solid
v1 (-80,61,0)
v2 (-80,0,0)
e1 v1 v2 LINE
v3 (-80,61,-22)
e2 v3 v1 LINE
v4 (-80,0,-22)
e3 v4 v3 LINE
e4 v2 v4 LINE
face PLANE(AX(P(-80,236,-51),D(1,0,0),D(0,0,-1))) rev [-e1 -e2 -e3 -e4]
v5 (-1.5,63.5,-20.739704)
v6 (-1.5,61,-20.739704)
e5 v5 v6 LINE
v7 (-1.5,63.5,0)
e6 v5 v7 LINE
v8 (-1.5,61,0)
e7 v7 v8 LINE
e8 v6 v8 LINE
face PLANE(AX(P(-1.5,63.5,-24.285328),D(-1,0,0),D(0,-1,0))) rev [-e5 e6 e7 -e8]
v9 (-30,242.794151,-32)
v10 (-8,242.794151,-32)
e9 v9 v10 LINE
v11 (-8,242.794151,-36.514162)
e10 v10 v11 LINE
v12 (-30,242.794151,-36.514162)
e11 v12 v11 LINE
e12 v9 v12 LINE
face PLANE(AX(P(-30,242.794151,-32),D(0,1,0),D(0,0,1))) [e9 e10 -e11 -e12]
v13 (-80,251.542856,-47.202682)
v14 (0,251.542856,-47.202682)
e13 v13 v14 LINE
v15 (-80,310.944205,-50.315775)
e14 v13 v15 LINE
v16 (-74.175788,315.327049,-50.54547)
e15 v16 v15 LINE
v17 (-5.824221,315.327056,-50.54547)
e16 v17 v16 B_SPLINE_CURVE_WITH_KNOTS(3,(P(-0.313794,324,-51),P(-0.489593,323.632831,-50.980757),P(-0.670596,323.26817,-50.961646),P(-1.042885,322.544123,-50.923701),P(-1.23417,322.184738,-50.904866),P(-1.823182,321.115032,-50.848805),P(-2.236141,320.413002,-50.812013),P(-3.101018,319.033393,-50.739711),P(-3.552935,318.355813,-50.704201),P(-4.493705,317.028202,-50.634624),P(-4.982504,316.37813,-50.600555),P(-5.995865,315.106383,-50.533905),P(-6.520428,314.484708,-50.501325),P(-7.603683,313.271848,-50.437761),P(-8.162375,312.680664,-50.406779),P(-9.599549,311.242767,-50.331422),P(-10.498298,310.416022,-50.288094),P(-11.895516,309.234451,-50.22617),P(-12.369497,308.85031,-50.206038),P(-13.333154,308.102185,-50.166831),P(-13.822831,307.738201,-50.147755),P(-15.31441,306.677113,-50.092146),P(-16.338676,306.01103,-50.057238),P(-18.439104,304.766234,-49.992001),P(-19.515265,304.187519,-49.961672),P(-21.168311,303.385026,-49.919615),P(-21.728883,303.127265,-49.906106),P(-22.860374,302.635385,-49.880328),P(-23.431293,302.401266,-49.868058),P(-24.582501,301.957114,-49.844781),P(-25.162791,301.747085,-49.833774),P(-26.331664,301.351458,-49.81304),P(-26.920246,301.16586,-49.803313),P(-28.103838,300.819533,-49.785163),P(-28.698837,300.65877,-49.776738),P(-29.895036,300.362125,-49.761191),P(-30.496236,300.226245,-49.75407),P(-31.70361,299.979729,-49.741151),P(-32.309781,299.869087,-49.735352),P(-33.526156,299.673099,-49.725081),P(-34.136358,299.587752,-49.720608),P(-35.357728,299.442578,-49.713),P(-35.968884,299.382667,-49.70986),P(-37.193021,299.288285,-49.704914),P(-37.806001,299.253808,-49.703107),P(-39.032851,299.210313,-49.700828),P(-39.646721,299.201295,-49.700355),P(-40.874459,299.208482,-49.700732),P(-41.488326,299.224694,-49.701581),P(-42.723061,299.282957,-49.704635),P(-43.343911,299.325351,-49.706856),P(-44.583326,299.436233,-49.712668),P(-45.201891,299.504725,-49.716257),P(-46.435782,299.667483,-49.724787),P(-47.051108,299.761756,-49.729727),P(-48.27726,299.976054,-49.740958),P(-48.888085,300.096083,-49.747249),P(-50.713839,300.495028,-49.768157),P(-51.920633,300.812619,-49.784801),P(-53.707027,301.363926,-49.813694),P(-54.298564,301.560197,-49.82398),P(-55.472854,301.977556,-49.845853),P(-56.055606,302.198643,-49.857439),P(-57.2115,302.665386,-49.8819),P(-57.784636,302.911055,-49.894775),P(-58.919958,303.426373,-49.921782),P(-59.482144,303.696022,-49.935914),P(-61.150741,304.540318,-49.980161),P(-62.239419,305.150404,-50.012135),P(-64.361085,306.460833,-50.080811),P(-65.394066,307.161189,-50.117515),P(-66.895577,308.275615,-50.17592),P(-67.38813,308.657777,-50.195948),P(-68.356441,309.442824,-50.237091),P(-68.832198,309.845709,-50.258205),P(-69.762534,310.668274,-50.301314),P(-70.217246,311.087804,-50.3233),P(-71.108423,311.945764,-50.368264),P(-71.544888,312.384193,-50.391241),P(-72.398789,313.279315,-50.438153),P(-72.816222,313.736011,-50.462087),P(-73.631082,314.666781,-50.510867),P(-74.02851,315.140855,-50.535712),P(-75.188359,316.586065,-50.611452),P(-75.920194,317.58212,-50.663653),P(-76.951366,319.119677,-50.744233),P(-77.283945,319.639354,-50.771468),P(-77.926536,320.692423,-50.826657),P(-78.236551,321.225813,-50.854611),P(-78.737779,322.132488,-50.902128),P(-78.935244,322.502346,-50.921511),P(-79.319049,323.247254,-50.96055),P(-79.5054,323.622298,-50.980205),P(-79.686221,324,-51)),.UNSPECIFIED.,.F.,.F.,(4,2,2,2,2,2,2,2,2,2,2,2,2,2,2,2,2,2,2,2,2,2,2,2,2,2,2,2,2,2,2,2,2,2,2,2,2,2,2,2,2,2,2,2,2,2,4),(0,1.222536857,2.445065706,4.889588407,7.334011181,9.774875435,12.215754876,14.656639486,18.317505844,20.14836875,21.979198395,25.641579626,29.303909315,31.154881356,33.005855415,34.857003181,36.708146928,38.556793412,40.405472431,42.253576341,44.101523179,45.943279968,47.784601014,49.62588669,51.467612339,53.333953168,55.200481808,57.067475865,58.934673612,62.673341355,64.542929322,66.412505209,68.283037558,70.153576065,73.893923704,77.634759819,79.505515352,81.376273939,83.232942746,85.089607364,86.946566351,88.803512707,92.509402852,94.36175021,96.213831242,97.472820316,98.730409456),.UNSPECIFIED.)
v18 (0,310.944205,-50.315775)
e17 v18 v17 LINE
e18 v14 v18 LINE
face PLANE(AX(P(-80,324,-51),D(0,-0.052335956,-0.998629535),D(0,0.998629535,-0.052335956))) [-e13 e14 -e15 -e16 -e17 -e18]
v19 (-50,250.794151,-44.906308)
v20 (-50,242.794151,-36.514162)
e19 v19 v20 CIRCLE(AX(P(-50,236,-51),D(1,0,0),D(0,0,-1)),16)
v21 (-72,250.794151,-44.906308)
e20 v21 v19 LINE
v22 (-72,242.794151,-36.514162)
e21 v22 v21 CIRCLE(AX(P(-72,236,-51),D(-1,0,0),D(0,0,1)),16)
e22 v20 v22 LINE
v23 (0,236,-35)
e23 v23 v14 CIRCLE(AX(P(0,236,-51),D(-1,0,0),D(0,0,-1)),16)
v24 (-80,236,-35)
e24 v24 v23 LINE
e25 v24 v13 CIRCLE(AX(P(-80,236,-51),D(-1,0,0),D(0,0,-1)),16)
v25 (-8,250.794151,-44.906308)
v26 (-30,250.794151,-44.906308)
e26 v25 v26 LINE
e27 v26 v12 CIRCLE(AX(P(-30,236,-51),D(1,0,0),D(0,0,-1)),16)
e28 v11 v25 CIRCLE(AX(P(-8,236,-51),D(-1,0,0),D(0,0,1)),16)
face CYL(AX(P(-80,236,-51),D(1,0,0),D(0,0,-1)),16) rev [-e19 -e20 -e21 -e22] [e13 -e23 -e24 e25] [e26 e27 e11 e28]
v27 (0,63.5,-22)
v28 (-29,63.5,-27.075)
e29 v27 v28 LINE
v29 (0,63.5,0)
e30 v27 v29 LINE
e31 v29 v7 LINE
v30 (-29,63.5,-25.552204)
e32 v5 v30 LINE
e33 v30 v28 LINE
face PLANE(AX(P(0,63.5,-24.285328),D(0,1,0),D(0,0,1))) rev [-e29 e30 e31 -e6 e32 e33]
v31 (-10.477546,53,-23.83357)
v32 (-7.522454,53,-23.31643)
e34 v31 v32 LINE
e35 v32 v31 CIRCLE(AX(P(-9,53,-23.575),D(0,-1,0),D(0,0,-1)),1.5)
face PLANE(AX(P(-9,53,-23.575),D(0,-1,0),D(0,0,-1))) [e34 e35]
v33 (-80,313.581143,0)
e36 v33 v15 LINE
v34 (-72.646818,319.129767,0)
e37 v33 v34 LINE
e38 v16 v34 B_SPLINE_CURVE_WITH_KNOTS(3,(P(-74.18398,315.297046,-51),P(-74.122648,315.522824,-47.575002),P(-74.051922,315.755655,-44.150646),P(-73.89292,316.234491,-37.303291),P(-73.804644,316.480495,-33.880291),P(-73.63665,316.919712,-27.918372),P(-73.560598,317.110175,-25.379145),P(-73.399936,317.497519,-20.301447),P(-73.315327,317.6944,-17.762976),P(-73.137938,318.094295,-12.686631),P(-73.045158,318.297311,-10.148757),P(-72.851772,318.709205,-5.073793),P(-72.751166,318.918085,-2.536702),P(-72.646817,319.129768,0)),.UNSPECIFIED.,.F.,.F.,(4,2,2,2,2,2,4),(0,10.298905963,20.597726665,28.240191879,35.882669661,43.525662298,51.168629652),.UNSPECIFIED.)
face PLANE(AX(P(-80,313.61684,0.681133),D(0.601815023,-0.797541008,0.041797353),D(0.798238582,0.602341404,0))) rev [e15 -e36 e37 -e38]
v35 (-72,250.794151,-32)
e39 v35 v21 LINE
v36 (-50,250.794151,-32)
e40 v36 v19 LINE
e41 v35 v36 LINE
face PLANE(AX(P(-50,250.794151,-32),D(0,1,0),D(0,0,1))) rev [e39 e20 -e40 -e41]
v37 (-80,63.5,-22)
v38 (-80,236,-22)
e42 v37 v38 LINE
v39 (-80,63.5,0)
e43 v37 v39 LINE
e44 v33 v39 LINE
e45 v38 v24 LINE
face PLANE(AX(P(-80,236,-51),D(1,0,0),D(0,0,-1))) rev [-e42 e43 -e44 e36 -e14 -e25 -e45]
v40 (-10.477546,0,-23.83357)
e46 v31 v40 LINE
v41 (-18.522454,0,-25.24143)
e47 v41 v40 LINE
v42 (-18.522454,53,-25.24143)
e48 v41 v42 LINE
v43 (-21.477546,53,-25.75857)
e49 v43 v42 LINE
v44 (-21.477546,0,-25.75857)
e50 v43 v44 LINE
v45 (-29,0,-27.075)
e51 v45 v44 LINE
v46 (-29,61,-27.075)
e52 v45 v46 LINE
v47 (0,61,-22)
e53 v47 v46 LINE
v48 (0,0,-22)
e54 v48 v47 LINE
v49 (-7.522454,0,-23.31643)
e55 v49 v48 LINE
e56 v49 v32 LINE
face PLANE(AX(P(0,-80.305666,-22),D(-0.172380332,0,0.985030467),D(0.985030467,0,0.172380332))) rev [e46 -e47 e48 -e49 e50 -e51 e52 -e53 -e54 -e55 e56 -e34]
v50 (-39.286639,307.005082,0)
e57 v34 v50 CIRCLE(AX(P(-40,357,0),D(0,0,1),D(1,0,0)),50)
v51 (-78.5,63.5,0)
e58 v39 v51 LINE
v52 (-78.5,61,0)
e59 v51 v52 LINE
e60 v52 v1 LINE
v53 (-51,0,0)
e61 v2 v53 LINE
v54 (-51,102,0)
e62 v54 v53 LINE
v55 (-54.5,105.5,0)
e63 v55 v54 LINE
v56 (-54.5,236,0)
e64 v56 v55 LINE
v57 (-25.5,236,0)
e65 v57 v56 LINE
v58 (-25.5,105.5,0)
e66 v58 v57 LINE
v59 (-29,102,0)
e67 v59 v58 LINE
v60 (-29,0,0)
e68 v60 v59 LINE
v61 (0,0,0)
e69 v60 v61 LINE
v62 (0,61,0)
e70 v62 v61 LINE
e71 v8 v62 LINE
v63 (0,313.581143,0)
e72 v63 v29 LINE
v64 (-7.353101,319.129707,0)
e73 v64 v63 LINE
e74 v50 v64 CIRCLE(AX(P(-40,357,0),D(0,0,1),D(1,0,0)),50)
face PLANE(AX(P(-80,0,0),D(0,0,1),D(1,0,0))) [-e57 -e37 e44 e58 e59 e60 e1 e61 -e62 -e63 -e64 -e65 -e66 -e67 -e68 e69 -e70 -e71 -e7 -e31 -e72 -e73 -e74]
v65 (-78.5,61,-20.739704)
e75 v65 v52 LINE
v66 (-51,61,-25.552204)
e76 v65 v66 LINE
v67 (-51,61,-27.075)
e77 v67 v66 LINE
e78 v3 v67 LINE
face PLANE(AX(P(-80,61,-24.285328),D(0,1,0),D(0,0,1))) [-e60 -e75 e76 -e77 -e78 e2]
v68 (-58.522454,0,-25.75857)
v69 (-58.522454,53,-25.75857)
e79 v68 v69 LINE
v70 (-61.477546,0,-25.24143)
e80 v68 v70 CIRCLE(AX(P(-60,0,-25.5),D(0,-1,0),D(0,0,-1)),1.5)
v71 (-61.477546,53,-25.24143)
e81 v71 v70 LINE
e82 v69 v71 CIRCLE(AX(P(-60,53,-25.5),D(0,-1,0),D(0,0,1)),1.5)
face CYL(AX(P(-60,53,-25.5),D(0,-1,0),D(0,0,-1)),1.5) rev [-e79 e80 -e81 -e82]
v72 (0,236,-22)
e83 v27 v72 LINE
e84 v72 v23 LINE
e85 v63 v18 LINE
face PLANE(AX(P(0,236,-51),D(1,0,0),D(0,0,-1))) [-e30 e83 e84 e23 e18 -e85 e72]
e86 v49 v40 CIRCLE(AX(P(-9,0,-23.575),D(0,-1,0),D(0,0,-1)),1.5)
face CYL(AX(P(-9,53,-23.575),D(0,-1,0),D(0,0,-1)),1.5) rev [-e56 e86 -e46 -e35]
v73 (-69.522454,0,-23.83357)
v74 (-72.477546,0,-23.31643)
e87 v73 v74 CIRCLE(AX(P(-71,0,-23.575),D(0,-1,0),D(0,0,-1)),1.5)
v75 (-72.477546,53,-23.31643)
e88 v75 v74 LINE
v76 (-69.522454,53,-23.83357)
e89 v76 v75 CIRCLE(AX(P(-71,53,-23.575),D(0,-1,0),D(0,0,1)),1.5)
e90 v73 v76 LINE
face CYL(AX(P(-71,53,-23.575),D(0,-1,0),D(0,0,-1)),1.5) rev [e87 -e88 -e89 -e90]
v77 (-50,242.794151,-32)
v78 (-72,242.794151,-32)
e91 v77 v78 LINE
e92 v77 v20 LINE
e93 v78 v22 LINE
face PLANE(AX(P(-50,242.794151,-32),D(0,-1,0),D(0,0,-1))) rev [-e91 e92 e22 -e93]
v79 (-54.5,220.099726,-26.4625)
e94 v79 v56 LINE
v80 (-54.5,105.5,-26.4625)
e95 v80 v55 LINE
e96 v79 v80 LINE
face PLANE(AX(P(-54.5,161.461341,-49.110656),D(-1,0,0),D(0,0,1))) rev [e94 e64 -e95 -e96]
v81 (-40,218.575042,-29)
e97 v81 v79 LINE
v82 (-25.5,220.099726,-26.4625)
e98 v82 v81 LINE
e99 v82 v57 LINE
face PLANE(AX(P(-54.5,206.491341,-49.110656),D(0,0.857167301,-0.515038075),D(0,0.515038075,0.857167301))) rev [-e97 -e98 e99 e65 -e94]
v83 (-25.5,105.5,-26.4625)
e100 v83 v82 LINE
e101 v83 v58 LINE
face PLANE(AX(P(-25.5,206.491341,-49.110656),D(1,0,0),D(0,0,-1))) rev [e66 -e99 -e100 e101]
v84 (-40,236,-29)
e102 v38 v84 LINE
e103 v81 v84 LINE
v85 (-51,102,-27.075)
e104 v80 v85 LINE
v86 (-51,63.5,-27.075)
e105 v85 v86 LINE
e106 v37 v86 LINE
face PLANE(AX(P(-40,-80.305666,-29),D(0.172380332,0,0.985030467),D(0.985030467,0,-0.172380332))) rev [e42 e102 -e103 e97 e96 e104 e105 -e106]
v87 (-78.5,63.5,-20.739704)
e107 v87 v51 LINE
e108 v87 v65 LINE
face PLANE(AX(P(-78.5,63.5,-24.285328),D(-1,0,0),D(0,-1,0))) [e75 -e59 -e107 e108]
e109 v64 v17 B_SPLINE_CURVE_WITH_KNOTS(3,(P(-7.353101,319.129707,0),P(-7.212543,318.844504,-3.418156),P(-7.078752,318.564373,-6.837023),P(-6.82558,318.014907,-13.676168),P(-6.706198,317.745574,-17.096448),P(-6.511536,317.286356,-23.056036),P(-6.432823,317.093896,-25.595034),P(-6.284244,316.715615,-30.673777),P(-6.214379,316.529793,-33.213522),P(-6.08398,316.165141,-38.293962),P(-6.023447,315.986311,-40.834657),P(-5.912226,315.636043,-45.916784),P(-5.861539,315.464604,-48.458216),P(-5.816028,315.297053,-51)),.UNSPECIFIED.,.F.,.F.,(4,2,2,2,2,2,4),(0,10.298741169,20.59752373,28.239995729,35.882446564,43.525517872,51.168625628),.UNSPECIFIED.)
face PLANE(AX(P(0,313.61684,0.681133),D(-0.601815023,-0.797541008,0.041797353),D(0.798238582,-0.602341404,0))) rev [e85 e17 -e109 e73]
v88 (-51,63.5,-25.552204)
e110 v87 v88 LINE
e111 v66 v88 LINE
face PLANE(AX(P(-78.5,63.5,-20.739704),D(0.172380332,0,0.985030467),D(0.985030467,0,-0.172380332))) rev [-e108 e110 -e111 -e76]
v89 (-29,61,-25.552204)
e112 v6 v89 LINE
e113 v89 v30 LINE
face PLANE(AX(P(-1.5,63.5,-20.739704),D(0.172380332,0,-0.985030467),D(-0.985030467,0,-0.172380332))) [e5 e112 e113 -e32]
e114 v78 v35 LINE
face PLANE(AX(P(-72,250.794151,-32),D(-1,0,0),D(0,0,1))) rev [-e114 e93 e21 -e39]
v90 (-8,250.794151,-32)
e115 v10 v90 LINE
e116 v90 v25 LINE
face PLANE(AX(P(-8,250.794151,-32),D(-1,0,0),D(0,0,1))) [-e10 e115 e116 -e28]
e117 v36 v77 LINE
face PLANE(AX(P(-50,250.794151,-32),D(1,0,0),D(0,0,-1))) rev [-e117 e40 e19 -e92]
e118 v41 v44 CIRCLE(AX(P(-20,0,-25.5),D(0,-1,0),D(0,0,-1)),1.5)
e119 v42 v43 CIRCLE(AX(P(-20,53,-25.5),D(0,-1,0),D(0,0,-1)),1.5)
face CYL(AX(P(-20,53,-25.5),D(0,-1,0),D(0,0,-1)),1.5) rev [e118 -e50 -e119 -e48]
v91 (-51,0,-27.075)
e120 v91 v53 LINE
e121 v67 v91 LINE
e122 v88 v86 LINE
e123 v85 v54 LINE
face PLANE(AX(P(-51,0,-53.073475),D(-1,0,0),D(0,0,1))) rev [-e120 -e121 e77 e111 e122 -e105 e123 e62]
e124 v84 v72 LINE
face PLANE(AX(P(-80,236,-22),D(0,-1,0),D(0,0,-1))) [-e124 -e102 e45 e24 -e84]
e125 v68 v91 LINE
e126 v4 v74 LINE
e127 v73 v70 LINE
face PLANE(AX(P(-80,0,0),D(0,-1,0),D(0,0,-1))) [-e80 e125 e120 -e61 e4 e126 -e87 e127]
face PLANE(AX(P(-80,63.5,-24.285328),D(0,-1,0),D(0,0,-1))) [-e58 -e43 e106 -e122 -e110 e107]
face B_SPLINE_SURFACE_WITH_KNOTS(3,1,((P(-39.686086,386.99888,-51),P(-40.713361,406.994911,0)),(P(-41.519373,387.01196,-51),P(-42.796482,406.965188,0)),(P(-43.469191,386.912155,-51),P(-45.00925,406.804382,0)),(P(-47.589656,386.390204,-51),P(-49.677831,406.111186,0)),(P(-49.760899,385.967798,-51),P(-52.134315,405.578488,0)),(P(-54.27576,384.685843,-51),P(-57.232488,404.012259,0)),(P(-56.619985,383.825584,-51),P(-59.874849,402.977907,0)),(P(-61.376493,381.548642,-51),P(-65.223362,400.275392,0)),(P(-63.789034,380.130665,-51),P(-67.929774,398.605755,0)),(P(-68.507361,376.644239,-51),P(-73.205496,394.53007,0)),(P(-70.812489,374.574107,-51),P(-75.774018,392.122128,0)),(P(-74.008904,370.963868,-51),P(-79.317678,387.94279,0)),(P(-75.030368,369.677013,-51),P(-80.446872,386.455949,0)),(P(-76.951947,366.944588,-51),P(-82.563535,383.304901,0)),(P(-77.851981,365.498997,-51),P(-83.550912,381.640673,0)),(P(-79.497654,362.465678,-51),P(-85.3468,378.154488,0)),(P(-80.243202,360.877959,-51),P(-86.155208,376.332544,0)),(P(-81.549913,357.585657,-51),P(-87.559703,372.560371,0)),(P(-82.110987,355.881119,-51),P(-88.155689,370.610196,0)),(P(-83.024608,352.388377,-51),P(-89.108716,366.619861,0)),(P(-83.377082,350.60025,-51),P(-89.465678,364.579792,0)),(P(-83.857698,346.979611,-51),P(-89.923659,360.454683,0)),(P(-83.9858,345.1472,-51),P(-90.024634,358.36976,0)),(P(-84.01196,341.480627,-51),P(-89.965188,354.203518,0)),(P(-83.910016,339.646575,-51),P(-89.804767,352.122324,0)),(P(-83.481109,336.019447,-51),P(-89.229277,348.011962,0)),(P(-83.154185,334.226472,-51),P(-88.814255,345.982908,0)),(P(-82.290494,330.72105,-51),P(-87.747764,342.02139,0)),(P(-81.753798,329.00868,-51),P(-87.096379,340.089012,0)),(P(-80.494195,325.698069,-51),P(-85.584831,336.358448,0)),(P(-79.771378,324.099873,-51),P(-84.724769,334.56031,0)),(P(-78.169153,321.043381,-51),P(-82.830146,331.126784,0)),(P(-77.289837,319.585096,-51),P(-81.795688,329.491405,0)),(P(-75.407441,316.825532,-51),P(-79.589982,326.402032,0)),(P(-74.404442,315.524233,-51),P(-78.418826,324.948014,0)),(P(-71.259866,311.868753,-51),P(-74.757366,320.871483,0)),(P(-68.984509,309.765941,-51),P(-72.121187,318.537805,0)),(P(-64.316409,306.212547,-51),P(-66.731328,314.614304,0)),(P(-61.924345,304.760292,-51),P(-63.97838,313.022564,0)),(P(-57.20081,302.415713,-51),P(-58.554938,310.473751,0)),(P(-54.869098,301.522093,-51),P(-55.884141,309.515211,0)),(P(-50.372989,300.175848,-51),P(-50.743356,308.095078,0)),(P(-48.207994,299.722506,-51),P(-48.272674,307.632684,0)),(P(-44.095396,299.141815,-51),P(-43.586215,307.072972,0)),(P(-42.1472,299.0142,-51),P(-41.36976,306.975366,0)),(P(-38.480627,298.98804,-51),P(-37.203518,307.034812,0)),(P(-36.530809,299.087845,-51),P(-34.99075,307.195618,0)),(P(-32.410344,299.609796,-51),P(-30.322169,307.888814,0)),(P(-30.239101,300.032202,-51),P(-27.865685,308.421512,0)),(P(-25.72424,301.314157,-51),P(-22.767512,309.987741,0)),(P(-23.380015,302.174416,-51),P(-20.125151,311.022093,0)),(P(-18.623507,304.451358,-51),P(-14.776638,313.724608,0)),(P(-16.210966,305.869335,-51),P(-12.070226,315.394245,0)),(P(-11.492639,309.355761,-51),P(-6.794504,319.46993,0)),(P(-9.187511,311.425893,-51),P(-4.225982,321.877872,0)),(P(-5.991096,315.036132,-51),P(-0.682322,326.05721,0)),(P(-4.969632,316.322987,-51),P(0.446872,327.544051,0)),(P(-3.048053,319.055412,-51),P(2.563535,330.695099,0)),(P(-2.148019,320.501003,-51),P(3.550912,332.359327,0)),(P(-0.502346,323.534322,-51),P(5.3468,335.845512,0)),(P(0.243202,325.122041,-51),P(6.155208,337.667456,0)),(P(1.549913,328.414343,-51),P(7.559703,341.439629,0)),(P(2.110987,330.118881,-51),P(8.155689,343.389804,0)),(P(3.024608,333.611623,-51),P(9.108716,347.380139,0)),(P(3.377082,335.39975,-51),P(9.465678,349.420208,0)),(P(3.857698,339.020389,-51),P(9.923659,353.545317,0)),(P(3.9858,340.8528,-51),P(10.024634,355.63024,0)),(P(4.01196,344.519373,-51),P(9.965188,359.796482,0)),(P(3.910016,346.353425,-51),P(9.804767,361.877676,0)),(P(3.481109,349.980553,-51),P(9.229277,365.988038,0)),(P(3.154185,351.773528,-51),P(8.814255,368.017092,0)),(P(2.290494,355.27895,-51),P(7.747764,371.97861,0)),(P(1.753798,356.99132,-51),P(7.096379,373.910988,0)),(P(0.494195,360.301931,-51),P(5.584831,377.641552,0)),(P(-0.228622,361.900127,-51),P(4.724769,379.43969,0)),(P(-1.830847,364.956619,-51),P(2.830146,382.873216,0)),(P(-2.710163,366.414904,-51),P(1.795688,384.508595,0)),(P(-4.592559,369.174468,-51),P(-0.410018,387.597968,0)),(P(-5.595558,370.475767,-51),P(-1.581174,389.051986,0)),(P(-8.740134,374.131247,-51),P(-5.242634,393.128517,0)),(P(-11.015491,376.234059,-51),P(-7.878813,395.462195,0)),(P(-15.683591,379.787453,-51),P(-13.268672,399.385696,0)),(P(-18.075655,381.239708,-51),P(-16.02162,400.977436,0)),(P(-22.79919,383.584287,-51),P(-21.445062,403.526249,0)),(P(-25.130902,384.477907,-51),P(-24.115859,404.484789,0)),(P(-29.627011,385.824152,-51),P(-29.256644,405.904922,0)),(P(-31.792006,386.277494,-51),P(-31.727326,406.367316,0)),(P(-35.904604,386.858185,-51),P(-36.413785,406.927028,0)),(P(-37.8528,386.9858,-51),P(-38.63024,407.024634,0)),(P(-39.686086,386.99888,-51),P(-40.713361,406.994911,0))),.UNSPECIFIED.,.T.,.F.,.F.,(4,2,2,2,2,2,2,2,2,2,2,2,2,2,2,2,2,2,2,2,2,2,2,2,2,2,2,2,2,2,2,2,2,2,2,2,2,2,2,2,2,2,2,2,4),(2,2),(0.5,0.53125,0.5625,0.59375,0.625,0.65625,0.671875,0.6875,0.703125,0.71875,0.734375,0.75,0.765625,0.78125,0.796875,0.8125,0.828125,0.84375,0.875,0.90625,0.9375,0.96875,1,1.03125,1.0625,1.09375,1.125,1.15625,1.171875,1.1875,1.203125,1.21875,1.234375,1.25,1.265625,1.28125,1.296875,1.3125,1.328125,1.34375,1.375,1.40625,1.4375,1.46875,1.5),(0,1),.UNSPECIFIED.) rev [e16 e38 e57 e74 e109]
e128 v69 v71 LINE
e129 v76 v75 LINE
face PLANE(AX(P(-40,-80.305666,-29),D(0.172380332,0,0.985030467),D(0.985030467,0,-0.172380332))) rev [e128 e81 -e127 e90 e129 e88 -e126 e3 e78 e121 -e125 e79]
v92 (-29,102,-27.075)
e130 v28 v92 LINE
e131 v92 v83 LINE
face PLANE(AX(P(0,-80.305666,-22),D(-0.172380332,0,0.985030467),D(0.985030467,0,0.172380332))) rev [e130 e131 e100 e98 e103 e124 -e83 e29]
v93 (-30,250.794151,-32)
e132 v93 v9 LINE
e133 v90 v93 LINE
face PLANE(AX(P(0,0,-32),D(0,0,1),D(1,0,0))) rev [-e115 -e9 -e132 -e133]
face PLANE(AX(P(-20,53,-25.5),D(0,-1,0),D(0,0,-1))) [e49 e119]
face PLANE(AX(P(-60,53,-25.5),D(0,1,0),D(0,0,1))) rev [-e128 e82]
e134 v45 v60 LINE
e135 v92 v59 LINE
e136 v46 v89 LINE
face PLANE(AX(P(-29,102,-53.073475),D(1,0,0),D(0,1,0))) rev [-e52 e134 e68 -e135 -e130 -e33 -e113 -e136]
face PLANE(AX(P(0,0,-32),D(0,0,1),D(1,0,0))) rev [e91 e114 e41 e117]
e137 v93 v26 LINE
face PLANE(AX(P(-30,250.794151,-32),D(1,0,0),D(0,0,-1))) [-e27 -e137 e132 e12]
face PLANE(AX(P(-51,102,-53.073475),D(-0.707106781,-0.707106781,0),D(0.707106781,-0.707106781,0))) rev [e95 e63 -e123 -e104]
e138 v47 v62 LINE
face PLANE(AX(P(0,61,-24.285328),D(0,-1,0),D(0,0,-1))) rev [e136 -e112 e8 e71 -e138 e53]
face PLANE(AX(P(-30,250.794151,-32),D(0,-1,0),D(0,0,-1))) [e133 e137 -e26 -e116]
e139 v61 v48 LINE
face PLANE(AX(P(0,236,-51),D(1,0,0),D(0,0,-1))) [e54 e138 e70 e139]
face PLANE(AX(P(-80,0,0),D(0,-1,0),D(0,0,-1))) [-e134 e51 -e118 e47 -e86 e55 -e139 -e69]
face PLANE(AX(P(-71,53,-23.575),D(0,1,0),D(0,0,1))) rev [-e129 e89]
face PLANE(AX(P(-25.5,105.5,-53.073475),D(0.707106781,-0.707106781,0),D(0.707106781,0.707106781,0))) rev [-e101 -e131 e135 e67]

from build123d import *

# Parameters (mm, degrees)
EXTRUDE_1_DEPTH     = 80
CUT_EXTRUDE_1_DEPTH = 338.16811987
CUT_EXTRUDE_4_DEPTH = 258.724089853
EXTRUDE_2_DEPTH     = 236
SKETCH_8_W          = 29
SKETCH_8_H          = 45.03
CUT_EXTRUDE_5_DEPTH = 333.864316987
SKETCH_11_W         = 1.5
SKETCH_11_H         = 2.5
SKETCH_12_R         = 1.5
CUT_EXTRUDE_6_DEPTH = 53


with BuildPart() as part:
    # Эскиз1 → Бобышка-Вытянуть1 (new body)
    with BuildSketch(Plane(origin=(0, 0, 0), x_dir=(0, 0, -1), z_dir=(1, 0, 0))):
        with BuildLine():
            Line((0, 0), (0, 324))
            Line((0, 324), (51, 324))
            Line((51, 324), (47.202681995, 251.542856107))
            ThreePointArc((47.202681995, 251.542856107), (38.415146245, 245.880357077), (35, 236))
            Line((35, 236), (22, 236))
            Line((22, 236), (22, 0))
            Line((22, 0), (0, 0))
        make_face()
    extrude(amount=-EXTRUDE_1_DEPTH)

    # Вырез-По сечениям1: read off the stored shape, not the designer's step
    # Вырез-По сечениям1: loft between two sections, ruled curve by curve
    loft_1_from = [
        Edge.make_bspline([(-39.686086493, 386.998880194, -51), (-41.519373167, 387.011959923, -51), (-43.469191145, 386.912155262, -51), (-47.589656467, 386.390203752, -51), (-49.760899046, 385.967798341, -51), (-54.275759928, 384.685843196, -51), (-56.619984777, 383.82558407, -51), (-61.376492683, 381.5486416, -51), (-63.789033826, 380.130665414, -51), (-68.507360794, 376.644239105, -51), (-70.812489477, 374.574106824, -51), (-74.008903802, 370.963867661, -51), (-75.030367598, 369.677012554, -51), (-76.951946734, 366.944587811, -51), (-77.851980564, 365.498997396, -51), (-79.497654124, 362.465678388, -51), (-80.243201605, 360.877958795, -51), (-81.549913197, 357.585657318, -51), (-82.110987295, 355.881119395, -51), (-83.024607662, 352.388377038, -51), (-83.377081555, 350.600250078, -51), (-83.857698345, 346.979610705, -51), (-83.985800464, 345.147200182, -51), (-84.011959923, 341.480626833, -51), (-83.910016471, 339.646575032, -51), (-83.481109456, 336.019446589, -51), (-83.154185214, 334.226472409, -51), (-82.290493812, 330.721049679, -51), (-81.753797915, 329.008679629, -51), (-80.494195327, 325.69806858, -51), (-79.771378013, 324.099872821, -51), (-78.169152689, 321.043381421, -51), (-77.289836791, 319.585096094, -51), (-75.407440689, 316.825531587, -51), (-74.404442283, 315.524232794, -51), (-71.259865805, 311.868753328, -51), (-68.984509326, 309.765941211, -51), (-64.316408519, 306.212546688, -51), (-61.924345268, 304.76029167, -51), (-57.200809972, 302.415713078, -51), (-54.869098312, 301.522093112, -51), (-50.372988531, 300.17584848, -51), (-48.207994046, 299.722505841, -51), (-44.095395614, 299.141814883, -51), (-42.147200182, 299.014199536, -51), (-38.480626833, 298.988040077, -51), (-36.530808855, 299.087844738, -51), (-32.410343533, 299.609796248, -51), (-30.239100954, 300.032201659, -51), (-25.724240072, 301.314156804, -51), (-23.380015223, 302.17441593, -51), (-18.623507317, 304.4513584, -51), (-16.210966174, 305.869334586, -51), (-11.492639206, 309.355760895, -51), (-9.187510523, 311.425893176, -51), (-5.991096198, 315.036132339, -51), (-4.969632402, 316.322987446, -51), (-3.048053266, 319.055412189, -51), (-2.148019436, 320.501002604, -51), (-0.502345876, 323.534321612, -51), (0.243201605, 325.122041205, -51), (1.549913197, 328.414342682, -51), (2.110987295, 330.118880605, -51), (3.024607662, 333.611622962, -51), (3.377081555, 335.399749922, -51), (3.857698345, 339.020389295, -51), (3.985800464, 340.852799818, -51), (4.011959923, 344.519373167, -51), (3.910016471, 346.353424968, -51), (3.481109456, 349.980553411, -51), (3.154185214, 351.773527591, -51), (2.290493812, 355.278950321, -51), (1.753797915, 356.991320371, -51), (0.494195327, 360.30193142, -51), (-0.228621987, 361.900127179, -51), (-1.830847311, 364.956618579, -51), (-2.710163209, 366.414903906, -51), (-4.592559311, 369.174468413, -51), (-5.595557717, 370.475767206, -51), (-8.740134195, 374.131246672, -51), (-11.015490674, 376.234058789, -51), (-15.683591481, 379.787453312, -51), (-18.075654732, 381.23970833, -51), (-22.799190028, 383.584286922, -51), (-25.130901688, 384.477906888, -51), (-29.627011469, 385.82415152, -51), (-31.792005954, 386.277494159, -51), (-35.904604386, 386.858185117, -51), (-37.852799818, 386.985800464, -51), (-39.686086493, 386.998880194, -51)], [0.5, 0.5, 0.5, 0.5, 0.53125, 0.53125, 0.5625, 0.5625, 0.59375, 0.59375, 0.625, 0.625, 0.65625, 0.65625, 0.671875, 0.671875, 0.6875, 0.6875, 0.703125, 0.703125, 0.71875, 0.71875, 0.734375, 0.734375, 0.75, 0.75, 0.765625, 0.765625, 0.78125, 0.78125, 0.796875, 0.796875, 0.8125, 0.8125, 0.828125, 0.828125, 0.84375, 0.84375, 0.875, 0.875, 0.90625, 0.90625, 0.9375, 0.9375, 0.96875, 0.96875, 1, 1, 1.03125, 1.03125, 1.0625, 1.0625, 1.09375, 1.09375, 1.125, 1.125, 1.15625, 1.15625, 1.171875, 1.171875, 1.1875, 1.1875, 1.203125, 1.203125, 1.21875, 1.21875, 1.234375, 1.234375, 1.25, 1.25, 1.265625, 1.265625, 1.28125, 1.28125, 1.296875, 1.296875, 1.3125, 1.3125, 1.328125, 1.328125, 1.34375, 1.34375, 1.375, 1.375, 1.40625, 1.40625, 1.4375, 1.4375, 1.46875, 1.46875, 1.5, 1.5, 1.5, 1.5], 3),
    ]
    loft_1_to = [
        Edge.make_bspline([(-40.713360954, 406.994910903, 0), (-42.796482241, 406.965187529, 0), (-45.009249926, 406.804381918, 0), (-49.677831319, 406.111186343, 0), (-52.134314987, 405.57848815, 0), (-57.232488149, 404.012258649, 0), (-59.874849492, 402.977906649, 0), (-65.223361777, 400.275392116, 0), (-67.929774494, 398.605754504, 0), (-73.205496114, 394.530069796, 0), (-75.774017529, 392.122127574, 0), (-79.317678059, 387.942789724, 0), (-80.446871791, 386.455948521, 0), (-82.56353512, 383.304901046, 0), (-83.550911607, 381.64067315, 0), (-85.346800294, 378.15448837, 0), (-86.155207908, 376.332543952, 0), (-87.559702616, 372.560371453, 0), (-88.155688516, 370.610195503, 0), (-89.108716472, 366.619860939, 0), (-89.465678189, 364.579792104, 0), (-89.923659015, 360.454683427, 0), (-90.024634276, 358.369760334, 0), (-89.965187529, 354.203517759, 0), (-89.804767323, 352.122324432, 0), (-89.229277266, 348.011962011, 0), (-88.814254578, 345.982908368, 0), (-87.74776424, 342.021389647, 0), (-87.09637946, 340.08901202, 0), (-85.584830664, 336.358447587, 0), (-84.72476929, 334.560310005, 0), (-82.830145523, 331.126783934, 0), (-81.795688029, 329.491404922, 0), (-79.589982191, 326.402031913, 0), (-78.418826302, 324.948013642, 0), (-74.757365501, 320.871483301, 0), (-72.121187465, 318.537805224, 0), (-66.731328092, 314.614304187, 0), (-63.978379853, 313.022564402, 0), (-58.5549381, 310.473751342, 0), (-55.884140832, 309.515211055, 0), (-50.743356242, 308.095077878, 0), (-48.27267393, 307.632683797, 0), (-43.586215216, 307.072972214, 0), (-41.369760334, 306.975365724, 0), (-37.203517759, 307.034812471, 0), (-34.990750074, 307.195618082, 0), (-30.322168681, 307.888813657, 0), (-27.865685013, 308.42151185, 0), (-22.767511851, 309.987741351, 0), (-20.125150508, 311.022093351, 0), (-14.776638223, 313.724607884, 0), (-12.070225506, 315.394245496, 0), (-6.794503886, 319.469930204, 0), (-4.225982471, 321.877872426, 0), (-0.682321941, 326.057210276, 0), (0.446871791, 327.544051479, 0), (2.56353512, 330.695098954, 0), (3.550911607, 332.35932685, 0), (5.346800294, 335.84551163, 0), (6.155207908, 337.667456048, 0), (7.559702616, 341.439628547, 0), (8.155688516, 343.389804497, 0), (9.108716472, 347.380139061, 0), (9.465678189, 349.420207896, 0), (9.923659015, 353.545316573, 0), (10.024634276, 355.630239666, 0), (9.965187529, 359.796482241, 0), (9.804767323, 361.877675568, 0), (9.229277266, 365.988037989, 0), (8.814254578, 368.017091632, 0), (7.74776424, 371.978610353, 0), (7.09637946, 373.91098798, 0), (5.584830664, 377.641552413, 0), (4.72476929, 379.439689995, 0), (2.830145523, 382.873216066, 0), (1.795688029, 384.508595078, 0), (-0.410017809, 387.597968087, 0), (-1.581173698, 389.051986358, 0), (-5.242634499, 393.128516699, 0), (-7.878812535, 395.462194776, 0), (-13.268671908, 399.385695813, 0), (-16.021620147, 400.977435598, 0), (-21.4450619, 403.526248658, 0), (-24.115859168, 404.484788945, 0), (-29.256643758, 405.904922122, 0), (-31.72732607, 406.367316203, 0), (-36.413784784, 406.927027786, 0), (-38.630239666, 407.024634276, 0), (-40.713360954, 406.994910903, 0)], [0.5, 0.5, 0.5, 0.5, 0.53125, 0.53125, 0.5625, 0.5625, 0.59375, 0.59375, 0.625, 0.625, 0.65625, 0.65625, 0.671875, 0.671875, 0.6875, 0.6875, 0.703125, 0.703125, 0.71875, 0.71875, 0.734375, 0.734375, 0.75, 0.75, 0.765625, 0.765625, 0.78125, 0.78125, 0.796875, 0.796875, 0.8125, 0.8125, 0.828125, 0.828125, 0.84375, 0.84375, 0.875, 0.875, 0.90625, 0.90625, 0.9375, 0.9375, 0.96875, 0.96875, 1, 1, 1.03125, 1.03125, 1.0625, 1.0625, 1.09375, 1.09375, 1.125, 1.125, 1.15625, 1.15625, 1.171875, 1.171875, 1.1875, 1.1875, 1.203125, 1.203125, 1.21875, 1.21875, 1.234375, 1.234375, 1.25, 1.25, 1.265625, 1.265625, 1.28125, 1.28125, 1.296875, 1.296875, 1.3125, 1.3125, 1.328125, 1.328125, 1.34375, 1.34375, 1.375, 1.375, 1.40625, 1.40625, 1.4375, 1.4375, 1.46875, 1.46875, 1.5, 1.5, 1.5, 1.5], 3),
    ]
    loft_1 = Solid(Shell([*[Face.make_surface_from_curves(loft_1_from[k], loft_1_to[k]) for k in range(1)], Face(Wire(loft_1_from)), Face(Wire(loft_1_to))]))
    add(loft_1, mode=Mode.SUBTRACT)

    # Эскиз5 → Вырез-Вытянуть1 (cut, through all)
    with BuildSketch(Plane(origin=(0, -1.778022863, -33.926697283), x_dir=(-1, 0, 0), z_dir=(0, -0.05233595624294387, -0.998629534754574))):
        Polygon((80, 313.151391037), (56.299680313, 331.010862926), (80, 331.010862926), align=None)
        Polygon((0, 313.151391037), (23.700319687, 331.010862926), (0, 331.010862926), align=None)
    extrude(amount=-CUT_EXTRUDE_1_DEPTH, mode=Mode.SUBTRACT)

    # Эскиз3 → Вырез-Вытянуть4 (cut, through all)
    with BuildSketch(Plane(origin=(-50, 250.794151495, -32), x_dir=(-0.9397934234884354, -0.341743063086709, -1.1856594285774567e-15), z_dir=(0, 0, -1))):
        Polygon((0, 0), (20.675455317, 7.518347388), (23.409399821, 0), (2.733944505, -7.518347388), align=None)
    cut_extrude_4 = extrude(amount=CUT_EXTRUDE_4_DEPTH, mode=Mode.SUBTRACT)

    # Зеркальное отражение1: Вырез-Вытянуть4 across plane
    add(cut_extrude_4.mirror(Plane(origin=(-40, 0, 0), x_dir=(0, 0, 1), z_dir=(1, 0, 0))), mode=Mode.SUBTRACT)

    # Эскиз6 → Бобышка-Вытянуть2 (add)
    with BuildSketch(Plane.XZ.offset(-236)):
        Polygon((0, -22), (-40, -29), (-80, -22), align=None)
    extrude(amount=EXTRUDE_2_DEPTH)

    # Вырез-По траектории1: sweep along a curve in space
    with BuildLine() as sweep_1_path:
        Line((-40, 236, 0), (-40, 206.49134077, -49.110656108))
    # Эскиз8 → Вырез-По траектории1 (sweep, cut)
    with BuildSketch(Plane.XY):
        with Locations((-40, 213.485)):
            Rectangle(SKETCH_8_W, SKETCH_8_H)
    sweep(path=sweep_1_path.line, mode=Mode.SUBTRACT)

    # Эскиз9 → Вырез-Вытянуть5 (cut, through all)
    with BuildSketch(Plane.XY):
        Polygon((-54.5, 190.97), (-25.5, 190.97), (-25.5, 105.5), (-29, 102), (-29, 0), (-51, 0), (-51, 102), (-54.5, 105.5), align=None)
    extrude(amount=-CUT_EXTRUDE_5_DEPTH, mode=Mode.SUBTRACT)

    # Вырез-По траектории4: sweep along a curve in space
    with BuildLine() as sweep_4_path:
        Line((0, 62.25, 0), (0, 62.25, -22))
        Line((0, 62.25, -22), (-29, 62.25, -27.075))
    # Эскиз11 → Вырез-По траектории4 (sweep, cut)
    with BuildSketch(Plane.XY):
        with Locations((-0.75, 62.25)):
            Rectangle(SKETCH_11_W, SKETCH_11_H)
    sweep_4 = sweep(path=sweep_4_path.line, transition=Transition.RIGHT, mode=Mode.SUBTRACT)

    # Зеркальное отражение2: Вырез-По траектории4 across plane
    add(sweep_4.mirror(Plane(origin=(-40, 0, 0), x_dir=(0, 0, 1), z_dir=(1, 0, 0))), mode=Mode.SUBTRACT)

    # Эскиз12 → Вырез-Вытянуть6 (cut)
    with BuildSketch(Plane.XZ):
        with Locations((-20, -25.5)):
            Circle(SKETCH_12_R)
        with Locations((-9, -23.575)):
            Circle(SKETCH_12_R)
        with Locations((-60, -25.5)):
            Circle(SKETCH_12_R)
        with Locations((-71, -23.575)):
            Circle(SKETCH_12_R)
    extrude(amount=-CUT_EXTRUDE_6_DEPTH, mode=Mode.SUBTRACT)


solid = part.part
